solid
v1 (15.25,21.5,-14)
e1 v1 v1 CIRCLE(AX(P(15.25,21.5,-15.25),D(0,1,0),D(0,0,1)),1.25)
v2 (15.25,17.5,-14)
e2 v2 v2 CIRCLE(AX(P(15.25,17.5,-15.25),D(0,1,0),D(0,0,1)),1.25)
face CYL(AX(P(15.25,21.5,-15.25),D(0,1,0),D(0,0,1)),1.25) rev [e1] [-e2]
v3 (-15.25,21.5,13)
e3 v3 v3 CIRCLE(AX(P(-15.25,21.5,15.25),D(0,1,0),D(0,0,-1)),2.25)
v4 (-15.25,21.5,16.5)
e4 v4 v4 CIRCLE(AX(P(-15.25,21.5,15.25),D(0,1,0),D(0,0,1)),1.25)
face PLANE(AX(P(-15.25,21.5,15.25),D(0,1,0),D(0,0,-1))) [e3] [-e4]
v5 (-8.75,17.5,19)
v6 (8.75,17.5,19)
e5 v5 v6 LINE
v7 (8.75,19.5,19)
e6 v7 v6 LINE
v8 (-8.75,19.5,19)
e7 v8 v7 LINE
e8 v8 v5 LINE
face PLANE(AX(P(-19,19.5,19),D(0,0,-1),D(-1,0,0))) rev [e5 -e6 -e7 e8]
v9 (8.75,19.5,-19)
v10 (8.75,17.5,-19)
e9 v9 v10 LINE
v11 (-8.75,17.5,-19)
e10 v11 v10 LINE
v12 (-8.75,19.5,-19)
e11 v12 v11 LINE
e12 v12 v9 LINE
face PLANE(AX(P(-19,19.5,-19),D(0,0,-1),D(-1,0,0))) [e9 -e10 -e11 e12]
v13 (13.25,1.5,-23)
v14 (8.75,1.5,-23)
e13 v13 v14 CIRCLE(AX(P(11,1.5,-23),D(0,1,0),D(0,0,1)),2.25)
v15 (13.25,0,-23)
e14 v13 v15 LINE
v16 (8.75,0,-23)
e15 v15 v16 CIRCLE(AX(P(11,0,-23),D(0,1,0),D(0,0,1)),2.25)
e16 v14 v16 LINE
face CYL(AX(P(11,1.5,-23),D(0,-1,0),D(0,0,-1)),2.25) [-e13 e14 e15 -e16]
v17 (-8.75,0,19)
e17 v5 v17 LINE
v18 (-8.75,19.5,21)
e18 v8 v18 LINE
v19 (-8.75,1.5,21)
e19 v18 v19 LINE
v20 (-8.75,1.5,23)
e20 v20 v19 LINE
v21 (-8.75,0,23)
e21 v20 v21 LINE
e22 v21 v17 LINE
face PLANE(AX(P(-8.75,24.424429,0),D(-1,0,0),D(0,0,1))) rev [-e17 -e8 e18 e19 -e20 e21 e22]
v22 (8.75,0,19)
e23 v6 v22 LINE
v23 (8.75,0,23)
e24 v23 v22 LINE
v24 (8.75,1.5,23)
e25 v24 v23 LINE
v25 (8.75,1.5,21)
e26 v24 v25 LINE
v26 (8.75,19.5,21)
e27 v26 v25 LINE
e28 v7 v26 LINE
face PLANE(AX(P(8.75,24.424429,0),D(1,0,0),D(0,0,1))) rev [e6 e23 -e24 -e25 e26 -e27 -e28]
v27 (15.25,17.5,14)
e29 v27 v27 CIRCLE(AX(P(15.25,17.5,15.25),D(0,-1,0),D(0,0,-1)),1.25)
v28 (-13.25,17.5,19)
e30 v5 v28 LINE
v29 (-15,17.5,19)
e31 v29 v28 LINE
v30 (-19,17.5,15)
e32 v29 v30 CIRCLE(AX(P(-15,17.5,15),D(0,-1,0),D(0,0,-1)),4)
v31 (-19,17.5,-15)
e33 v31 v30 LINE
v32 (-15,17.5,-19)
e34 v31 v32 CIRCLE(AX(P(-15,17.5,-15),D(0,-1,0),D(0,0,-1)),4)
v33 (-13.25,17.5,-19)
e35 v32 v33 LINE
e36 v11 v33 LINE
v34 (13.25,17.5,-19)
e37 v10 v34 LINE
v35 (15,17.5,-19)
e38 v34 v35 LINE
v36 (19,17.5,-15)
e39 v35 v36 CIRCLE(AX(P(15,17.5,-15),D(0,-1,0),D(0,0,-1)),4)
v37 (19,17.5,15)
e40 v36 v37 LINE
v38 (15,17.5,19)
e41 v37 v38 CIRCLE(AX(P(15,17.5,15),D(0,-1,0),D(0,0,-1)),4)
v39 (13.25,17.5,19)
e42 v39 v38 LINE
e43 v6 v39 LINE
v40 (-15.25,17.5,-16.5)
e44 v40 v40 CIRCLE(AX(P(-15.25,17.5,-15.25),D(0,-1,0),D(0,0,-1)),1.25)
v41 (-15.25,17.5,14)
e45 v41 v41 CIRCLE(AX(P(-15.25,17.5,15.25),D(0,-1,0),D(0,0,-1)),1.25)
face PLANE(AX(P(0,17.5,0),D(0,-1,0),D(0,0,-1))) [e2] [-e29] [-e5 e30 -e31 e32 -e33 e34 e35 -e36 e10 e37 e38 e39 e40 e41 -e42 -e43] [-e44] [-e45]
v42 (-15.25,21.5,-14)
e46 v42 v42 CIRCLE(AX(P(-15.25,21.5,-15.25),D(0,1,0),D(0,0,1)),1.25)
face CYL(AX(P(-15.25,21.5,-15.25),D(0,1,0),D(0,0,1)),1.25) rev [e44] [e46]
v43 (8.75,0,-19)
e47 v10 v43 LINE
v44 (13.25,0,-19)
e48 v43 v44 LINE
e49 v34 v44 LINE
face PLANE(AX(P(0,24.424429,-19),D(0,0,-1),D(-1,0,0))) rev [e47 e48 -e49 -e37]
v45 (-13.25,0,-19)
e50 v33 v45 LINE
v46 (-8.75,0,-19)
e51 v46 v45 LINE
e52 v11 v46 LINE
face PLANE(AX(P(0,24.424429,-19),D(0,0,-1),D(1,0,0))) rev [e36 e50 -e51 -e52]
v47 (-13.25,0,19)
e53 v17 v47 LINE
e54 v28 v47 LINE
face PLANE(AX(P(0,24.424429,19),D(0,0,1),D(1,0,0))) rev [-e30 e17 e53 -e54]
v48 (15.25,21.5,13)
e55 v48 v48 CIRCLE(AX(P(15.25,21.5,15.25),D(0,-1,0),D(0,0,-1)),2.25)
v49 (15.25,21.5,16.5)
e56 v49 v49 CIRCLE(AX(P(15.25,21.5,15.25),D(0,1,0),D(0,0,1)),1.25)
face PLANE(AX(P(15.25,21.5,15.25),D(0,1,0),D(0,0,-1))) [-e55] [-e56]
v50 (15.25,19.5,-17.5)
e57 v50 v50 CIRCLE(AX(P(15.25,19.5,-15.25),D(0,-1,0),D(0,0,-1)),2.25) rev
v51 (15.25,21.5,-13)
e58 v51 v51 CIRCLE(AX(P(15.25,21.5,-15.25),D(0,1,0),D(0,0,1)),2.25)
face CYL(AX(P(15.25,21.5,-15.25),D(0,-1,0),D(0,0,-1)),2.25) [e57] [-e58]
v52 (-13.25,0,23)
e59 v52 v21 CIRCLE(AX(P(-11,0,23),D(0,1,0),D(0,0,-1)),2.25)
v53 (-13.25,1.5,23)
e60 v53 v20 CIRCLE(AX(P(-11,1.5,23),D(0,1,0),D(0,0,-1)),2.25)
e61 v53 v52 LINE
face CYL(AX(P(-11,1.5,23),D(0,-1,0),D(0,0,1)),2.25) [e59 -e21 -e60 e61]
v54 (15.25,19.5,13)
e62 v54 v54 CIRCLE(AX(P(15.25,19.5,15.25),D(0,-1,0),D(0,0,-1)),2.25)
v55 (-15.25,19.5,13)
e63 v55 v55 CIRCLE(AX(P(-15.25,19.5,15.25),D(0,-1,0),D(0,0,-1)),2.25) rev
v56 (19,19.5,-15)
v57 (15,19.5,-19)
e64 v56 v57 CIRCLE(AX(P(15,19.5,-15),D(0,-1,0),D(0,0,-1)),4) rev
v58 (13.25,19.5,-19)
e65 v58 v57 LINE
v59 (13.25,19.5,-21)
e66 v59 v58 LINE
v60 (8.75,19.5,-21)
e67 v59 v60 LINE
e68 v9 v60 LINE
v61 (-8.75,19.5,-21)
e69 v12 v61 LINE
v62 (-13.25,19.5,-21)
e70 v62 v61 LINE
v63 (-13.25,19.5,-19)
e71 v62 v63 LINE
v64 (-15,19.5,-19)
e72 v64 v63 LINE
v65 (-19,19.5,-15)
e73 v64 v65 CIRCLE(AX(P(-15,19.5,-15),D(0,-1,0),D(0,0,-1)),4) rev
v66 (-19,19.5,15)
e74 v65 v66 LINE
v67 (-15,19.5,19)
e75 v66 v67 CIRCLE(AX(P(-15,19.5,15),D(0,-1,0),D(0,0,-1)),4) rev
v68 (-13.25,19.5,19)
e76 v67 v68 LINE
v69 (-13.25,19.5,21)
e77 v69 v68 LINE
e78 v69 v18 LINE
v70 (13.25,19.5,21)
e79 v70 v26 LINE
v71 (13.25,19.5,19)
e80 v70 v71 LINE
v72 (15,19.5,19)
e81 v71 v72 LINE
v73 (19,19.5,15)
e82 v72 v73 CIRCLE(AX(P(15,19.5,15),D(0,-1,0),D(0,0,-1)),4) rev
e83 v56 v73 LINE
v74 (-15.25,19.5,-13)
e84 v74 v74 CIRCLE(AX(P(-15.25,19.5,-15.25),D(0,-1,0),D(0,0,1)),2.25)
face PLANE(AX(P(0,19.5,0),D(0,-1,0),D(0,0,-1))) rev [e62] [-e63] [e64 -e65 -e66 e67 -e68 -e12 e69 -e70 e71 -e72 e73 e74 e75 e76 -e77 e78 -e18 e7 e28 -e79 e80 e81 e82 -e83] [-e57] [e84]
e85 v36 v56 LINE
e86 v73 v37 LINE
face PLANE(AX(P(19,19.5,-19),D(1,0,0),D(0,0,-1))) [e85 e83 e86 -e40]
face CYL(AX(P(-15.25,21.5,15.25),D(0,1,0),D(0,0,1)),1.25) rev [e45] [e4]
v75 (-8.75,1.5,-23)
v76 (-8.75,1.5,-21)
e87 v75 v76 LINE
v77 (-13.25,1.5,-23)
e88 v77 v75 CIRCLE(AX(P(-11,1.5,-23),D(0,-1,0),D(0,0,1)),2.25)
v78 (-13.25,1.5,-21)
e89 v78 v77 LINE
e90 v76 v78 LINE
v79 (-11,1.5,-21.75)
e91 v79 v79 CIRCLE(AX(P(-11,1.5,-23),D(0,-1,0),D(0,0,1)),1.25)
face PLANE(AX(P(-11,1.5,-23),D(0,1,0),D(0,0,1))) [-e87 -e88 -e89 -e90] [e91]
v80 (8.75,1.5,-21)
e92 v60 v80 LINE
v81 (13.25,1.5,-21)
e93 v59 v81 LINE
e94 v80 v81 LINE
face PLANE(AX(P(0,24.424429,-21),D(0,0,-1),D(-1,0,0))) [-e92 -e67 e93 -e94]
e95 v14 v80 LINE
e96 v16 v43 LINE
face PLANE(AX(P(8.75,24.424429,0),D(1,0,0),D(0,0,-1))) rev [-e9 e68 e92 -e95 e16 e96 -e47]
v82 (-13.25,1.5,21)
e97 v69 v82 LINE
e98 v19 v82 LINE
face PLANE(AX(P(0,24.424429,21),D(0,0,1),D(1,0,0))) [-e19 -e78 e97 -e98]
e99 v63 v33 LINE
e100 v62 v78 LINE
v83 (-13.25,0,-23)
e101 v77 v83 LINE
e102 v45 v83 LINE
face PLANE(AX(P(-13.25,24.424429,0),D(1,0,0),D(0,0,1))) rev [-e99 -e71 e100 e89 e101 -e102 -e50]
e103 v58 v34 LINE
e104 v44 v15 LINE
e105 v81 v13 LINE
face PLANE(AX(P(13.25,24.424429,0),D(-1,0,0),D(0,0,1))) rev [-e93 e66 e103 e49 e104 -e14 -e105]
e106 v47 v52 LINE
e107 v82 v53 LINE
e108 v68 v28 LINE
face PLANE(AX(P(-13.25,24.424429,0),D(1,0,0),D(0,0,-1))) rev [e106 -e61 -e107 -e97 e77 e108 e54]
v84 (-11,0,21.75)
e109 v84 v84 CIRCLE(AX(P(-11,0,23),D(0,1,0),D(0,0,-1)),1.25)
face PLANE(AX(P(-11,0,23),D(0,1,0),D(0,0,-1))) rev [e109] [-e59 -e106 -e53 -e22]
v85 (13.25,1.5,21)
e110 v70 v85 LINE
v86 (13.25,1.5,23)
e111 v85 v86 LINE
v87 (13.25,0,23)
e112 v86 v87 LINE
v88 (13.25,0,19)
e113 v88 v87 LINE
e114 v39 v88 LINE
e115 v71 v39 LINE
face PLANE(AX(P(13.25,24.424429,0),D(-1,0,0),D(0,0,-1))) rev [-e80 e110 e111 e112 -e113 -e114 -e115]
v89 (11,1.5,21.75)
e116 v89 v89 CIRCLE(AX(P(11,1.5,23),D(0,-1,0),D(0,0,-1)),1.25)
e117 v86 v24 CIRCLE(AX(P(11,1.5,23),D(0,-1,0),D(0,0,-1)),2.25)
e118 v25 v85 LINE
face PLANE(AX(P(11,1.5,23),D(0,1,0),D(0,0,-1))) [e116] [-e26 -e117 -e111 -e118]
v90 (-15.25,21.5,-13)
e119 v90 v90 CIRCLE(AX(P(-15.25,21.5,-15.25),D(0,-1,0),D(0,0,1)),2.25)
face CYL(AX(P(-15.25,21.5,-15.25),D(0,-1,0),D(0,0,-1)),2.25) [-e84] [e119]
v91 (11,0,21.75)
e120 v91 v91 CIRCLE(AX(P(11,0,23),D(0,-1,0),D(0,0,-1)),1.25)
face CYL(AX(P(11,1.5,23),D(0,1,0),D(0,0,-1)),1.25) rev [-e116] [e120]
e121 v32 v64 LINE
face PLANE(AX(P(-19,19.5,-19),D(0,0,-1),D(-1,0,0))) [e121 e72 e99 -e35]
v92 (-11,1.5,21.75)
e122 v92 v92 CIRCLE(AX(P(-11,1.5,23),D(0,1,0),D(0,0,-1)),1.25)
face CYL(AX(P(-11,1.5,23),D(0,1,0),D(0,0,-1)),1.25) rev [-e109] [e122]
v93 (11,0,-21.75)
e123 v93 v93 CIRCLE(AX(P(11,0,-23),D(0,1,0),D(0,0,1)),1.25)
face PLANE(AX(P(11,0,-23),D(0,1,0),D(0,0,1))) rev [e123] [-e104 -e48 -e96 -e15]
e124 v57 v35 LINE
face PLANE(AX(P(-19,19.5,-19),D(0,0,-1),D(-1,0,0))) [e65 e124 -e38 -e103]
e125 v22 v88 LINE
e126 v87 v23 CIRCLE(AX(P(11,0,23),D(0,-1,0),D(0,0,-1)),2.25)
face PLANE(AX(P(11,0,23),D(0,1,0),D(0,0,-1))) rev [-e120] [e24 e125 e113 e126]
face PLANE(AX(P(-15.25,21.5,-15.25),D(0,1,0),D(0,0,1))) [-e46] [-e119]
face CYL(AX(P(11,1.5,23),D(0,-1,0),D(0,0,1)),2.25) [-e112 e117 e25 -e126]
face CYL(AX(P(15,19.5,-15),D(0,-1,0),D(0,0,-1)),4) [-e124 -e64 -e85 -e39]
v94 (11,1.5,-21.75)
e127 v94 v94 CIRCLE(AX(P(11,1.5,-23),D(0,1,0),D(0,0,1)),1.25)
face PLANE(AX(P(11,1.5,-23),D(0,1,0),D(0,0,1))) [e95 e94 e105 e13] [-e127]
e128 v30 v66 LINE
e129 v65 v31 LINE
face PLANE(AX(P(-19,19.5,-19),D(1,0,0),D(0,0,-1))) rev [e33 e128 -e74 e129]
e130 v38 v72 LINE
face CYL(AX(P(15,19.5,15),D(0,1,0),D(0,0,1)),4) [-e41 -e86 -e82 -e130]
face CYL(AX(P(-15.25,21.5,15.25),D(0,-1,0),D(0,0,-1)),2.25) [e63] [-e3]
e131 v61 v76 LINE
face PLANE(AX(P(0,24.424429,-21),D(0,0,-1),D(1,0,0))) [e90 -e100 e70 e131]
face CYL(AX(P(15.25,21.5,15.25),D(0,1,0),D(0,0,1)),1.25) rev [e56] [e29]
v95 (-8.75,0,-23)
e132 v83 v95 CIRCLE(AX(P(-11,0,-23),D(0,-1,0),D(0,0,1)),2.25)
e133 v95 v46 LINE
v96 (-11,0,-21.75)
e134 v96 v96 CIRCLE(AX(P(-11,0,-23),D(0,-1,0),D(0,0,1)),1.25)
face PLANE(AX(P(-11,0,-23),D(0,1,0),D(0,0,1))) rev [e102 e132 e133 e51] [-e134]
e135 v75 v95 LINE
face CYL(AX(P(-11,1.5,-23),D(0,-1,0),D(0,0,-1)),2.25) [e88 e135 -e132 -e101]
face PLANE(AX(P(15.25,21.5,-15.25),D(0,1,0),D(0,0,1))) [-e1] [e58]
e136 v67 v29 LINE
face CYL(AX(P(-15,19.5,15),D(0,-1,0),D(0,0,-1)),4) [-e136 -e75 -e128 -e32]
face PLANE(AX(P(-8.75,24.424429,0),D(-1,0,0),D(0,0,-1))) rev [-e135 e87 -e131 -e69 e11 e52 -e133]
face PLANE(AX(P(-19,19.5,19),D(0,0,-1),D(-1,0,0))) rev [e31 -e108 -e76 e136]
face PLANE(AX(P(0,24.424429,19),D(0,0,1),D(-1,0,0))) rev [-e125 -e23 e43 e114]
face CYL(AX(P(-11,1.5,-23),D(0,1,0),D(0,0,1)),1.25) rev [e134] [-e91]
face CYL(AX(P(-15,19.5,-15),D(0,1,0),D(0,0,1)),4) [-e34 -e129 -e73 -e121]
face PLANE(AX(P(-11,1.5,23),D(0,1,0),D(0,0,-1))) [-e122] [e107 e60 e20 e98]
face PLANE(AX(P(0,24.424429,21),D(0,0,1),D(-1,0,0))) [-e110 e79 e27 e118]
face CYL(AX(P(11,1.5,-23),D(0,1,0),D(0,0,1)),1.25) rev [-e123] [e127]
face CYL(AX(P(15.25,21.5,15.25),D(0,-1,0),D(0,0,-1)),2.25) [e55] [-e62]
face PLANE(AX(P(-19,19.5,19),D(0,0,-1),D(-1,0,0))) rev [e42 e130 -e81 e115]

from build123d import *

# Parameters (mm, degrees)
SKETCH1_W                                  = 38
SKETCH1_H                                  = 38
BOSS_EXTRUDE1_DEPTH                        = 2
SKETCH2_R                                  = 2.25
BOSS_EXTRUDE2_DEPTH                        = 2
M3_TAPPED_HOLE1_D                          = 2.5
FILLET1_R                                  = 4
BOSS_EXTRUDE3_DEPTH                        = 1.5
SKETCH9_W                                  = 1.25
SKETCH9_H                                  = 1.5
SKETCH7_W                                  = 4.5
SKETCH7_H                                  = 2
BOSS_EXTRUDE4_DEPTH                        = 18
MIRROR1_AT_THE_SECOND_PLANE_COPY_1_SKETC_R = 2.25
MIRROR1_AT_THE_SECOND_PLANE_COPY_1_DEPTH   = 2
MIRROR1_AT_THE_SECOND_PLANE_COPY_2_D       = 2.5
MIRROR3_OUTLINE_W                          = 4.5
MIRROR3_OUTLINE_H                          = 2
MIRROR3_DEPTH                              = 19.5
MIRROR3_2_OUTLINE_R                        = 1.25
MIRROR3_2_DEPTH                            = 1.5


# Read off the part's stored shape, not the designer's step: Mirror3
with BuildPart() as part:
    # Sketch1 → Boss-Extrude1 (new body)
    with BuildSketch(Plane(origin=(0, 17.5, 0), x_dir=(1, 0, 0), z_dir=(0, 1, 0))):
        Rectangle(SKETCH1_W, SKETCH1_H)
    extrude(amount=BOSS_EXTRUDE1_DEPTH)

    # Sketch2 → Boss-Extrude2 (add)
    with BuildSketch(Plane(origin=(0, 19.5, 0), x_dir=(1, 0, 0), z_dir=(0, 1, 0))):
        with Locations(Location((15.25, 15.25, 0), (0, 0, 90))):
            Circle(SKETCH2_R)
    boss_extrude2 = extrude(amount=BOSS_EXTRUDE2_DEPTH)

    # M3 Tapped Hole1 (through all)
    with Locations(Plane(origin=(0, 21.5, 0), x_dir=(1, 0, 0), z_dir=(0, 1, 0))):
        with Locations((15.25, 15.25)):
            m3_tapped_hole1 = Hole(M3_TAPPED_HOLE1_D / 2)

    # Fillet1
    fillet1_edges = [part.edges().sort_by_distance(p)[0] for p in [
        (-19, 18.5, -19),
        (-19, 18.5, 19),
        (19, 18.5, 19),
        (19, 18.5, -19),
    ]]
    fillet(fillet1_edges, radius=FILLET1_R)



with BuildPart() as body_2:
    # Sketch6 → Boss-Extrude3 (new body)
    with BuildSketch(Plane(origin=(0, 0, 0), x_dir=(1, 0, 0), z_dir=(0, 1, 0))):
        with BuildLine():
            Line((13.25, 23), (13.25, 19))
            Line((13.25, 19), (8.75, 19))
            Line((8.75, 19), (8.75, 23))
            ThreePointArc((8.75, 23), (11, 25.25), (13.25, 23))
        make_face()
    extrude(amount=BOSS_EXTRUDE3_DEPTH)

    # Sketch9 → M3 Tapped Hole2 (revolve, cut)
    with BuildSketch(Plane(origin=(11, 1.5, -23), x_dir=(0, 0, 1), z_dir=(1, 0, 0))):
        with Locations((0.625, 0.75)):
            Rectangle(SKETCH9_W, SKETCH9_H)
    revolve(axis=Axis((11, 7.85, -23), (0, -1, 0)), mode=Mode.SUBTRACT)


with BuildPart() as part_1:
    add(part.part)

    add(body_2.part)  # Boss-Extrude4 merges body 2
    # Sketch7 → Boss-Extrude4 (add)
    with BuildSketch(Plane(origin=(0, 1.5, 0), x_dir=(1, 0, 0), z_dir=(0, 1, 0))):
        with Locations((11, 20)):
            Rectangle(SKETCH7_W, SKETCH7_H)
    extrude(amount=BOSS_EXTRUDE4_DEPTH)

    # Mirror1: Boss-Extrude2, M3 Tapped Hole1 across plane
    add(boss_extrude2.mirror(Plane(origin=(0, 0, 0), x_dir=(0, 0, 1), z_dir=(1, 0, 0))))
    add(m3_tapped_hole1.mirror(Plane(origin=(0, 0, 0), x_dir=(0, 0, 1), z_dir=(1, 0, 0))), mode=Mode.SUBTRACT)

    # Mirror1 at the second plane: Boss-Extrude2, M3 Tapped Hole1 across plane
    add(boss_extrude2.mirror(Plane.XY))
    add(m3_tapped_hole1.mirror(Plane.XY), mode=Mode.SUBTRACT)

    # Mirror1 at the second plane copy 1 sketc → Mirror1 at the second plane copy 1 (add)
    with BuildSketch(Plane(origin=(0, 19.5, 0), x_dir=(-1, 0, 0), z_dir=(0, 1, 0))):
        with Locations(Location((15.25, 15.25, 0), (0, 0, 90))):
            Circle(MIRROR1_AT_THE_SECOND_PLANE_COPY_1_SKETC_R)
    extrude(amount=MIRROR1_AT_THE_SECOND_PLANE_COPY_1_DEPTH)

    # Mirror1 at the second plane copy 2 (through all)
    with Locations(Plane(origin=(0, 21.5, 0), x_dir=(-1, 0, 0), z_dir=(0, 1, 0))):
        with Locations((15.25, 15.25)):
            Hole(MIRROR1_AT_THE_SECOND_PLANE_COPY_2_D / 2)

    # Mirror3 outline → Mirror3 (add)
    with BuildSketch(Plane(origin=(0, 0, 0), x_dir=(1, 0, 0), z_dir=(0, 1, 0))):
        with Locations((-11, -20)):
            Rectangle(MIRROR3_OUTLINE_W, MIRROR3_OUTLINE_H)
        with Locations((11, -20)):
            Rectangle(MIRROR3_OUTLINE_W, MIRROR3_OUTLINE_H)
        with Locations((-11, 20)):
            Rectangle(MIRROR3_OUTLINE_W, MIRROR3_OUTLINE_H)
    extrude(amount=MIRROR3_DEPTH)

    # Mirror3 2 outline → Mirror3 2 (add)
    # profile 1 of 3: a face of its own
    with BuildSketch(Plane(origin=(0, 0, 0), x_dir=(1, 0, 0), z_dir=(0, 1, 0))):
        with BuildLine():
            Line((13.25, -23), (13.25, -21))
            Line((13.25, -21), (8.75, -21))
            Line((8.75, -21), (8.75, -23))
            ThreePointArc((8.75, -23), (11, -25.25), (13.25, -23))
        make_face()
        with Locations((11, -23)):
            Circle(MIRROR3_2_OUTLINE_R, mode=Mode.SUBTRACT)
    # profile 2 of 3: a face of its own
    with BuildSketch(Plane(origin=(0, 0, 0), x_dir=(1, 0, 0), z_dir=(0, 1, 0))):
        with BuildLine():
            Line((-8.75, -23), (-8.75, -21))
            Line((-8.75, -21), (-13.25, -21))
            Line((-13.25, -21), (-13.25, -23))
            ThreePointArc((-13.25, -23), (-11, -25.25), (-8.75, -23))
        make_face()
        with Locations((-11, -23)):
            Circle(MIRROR3_2_OUTLINE_R, mode=Mode.SUBTRACT)
    # profile 3 of 3: a face of its own
    with BuildSketch(Plane(origin=(0, 0, 0), x_dir=(1, 0, 0), z_dir=(0, 1, 0))):
        with BuildLine():
            Line((-13.25, 21), (-8.75, 21))
            Line((-8.75, 21), (-8.75, 23))
            ThreePointArc((-8.75, 23), (-11, 25.25), (-13.25, 23))
            Line((-13.25, 23), (-13.25, 21))
        make_face()
        with Locations((-11, 23)):
            Circle(MIRROR3_2_OUTLINE_R, mode=Mode.SUBTRACT)
    extrude(amount=MIRROR3_2_DEPTH)


solid = part_1.part
